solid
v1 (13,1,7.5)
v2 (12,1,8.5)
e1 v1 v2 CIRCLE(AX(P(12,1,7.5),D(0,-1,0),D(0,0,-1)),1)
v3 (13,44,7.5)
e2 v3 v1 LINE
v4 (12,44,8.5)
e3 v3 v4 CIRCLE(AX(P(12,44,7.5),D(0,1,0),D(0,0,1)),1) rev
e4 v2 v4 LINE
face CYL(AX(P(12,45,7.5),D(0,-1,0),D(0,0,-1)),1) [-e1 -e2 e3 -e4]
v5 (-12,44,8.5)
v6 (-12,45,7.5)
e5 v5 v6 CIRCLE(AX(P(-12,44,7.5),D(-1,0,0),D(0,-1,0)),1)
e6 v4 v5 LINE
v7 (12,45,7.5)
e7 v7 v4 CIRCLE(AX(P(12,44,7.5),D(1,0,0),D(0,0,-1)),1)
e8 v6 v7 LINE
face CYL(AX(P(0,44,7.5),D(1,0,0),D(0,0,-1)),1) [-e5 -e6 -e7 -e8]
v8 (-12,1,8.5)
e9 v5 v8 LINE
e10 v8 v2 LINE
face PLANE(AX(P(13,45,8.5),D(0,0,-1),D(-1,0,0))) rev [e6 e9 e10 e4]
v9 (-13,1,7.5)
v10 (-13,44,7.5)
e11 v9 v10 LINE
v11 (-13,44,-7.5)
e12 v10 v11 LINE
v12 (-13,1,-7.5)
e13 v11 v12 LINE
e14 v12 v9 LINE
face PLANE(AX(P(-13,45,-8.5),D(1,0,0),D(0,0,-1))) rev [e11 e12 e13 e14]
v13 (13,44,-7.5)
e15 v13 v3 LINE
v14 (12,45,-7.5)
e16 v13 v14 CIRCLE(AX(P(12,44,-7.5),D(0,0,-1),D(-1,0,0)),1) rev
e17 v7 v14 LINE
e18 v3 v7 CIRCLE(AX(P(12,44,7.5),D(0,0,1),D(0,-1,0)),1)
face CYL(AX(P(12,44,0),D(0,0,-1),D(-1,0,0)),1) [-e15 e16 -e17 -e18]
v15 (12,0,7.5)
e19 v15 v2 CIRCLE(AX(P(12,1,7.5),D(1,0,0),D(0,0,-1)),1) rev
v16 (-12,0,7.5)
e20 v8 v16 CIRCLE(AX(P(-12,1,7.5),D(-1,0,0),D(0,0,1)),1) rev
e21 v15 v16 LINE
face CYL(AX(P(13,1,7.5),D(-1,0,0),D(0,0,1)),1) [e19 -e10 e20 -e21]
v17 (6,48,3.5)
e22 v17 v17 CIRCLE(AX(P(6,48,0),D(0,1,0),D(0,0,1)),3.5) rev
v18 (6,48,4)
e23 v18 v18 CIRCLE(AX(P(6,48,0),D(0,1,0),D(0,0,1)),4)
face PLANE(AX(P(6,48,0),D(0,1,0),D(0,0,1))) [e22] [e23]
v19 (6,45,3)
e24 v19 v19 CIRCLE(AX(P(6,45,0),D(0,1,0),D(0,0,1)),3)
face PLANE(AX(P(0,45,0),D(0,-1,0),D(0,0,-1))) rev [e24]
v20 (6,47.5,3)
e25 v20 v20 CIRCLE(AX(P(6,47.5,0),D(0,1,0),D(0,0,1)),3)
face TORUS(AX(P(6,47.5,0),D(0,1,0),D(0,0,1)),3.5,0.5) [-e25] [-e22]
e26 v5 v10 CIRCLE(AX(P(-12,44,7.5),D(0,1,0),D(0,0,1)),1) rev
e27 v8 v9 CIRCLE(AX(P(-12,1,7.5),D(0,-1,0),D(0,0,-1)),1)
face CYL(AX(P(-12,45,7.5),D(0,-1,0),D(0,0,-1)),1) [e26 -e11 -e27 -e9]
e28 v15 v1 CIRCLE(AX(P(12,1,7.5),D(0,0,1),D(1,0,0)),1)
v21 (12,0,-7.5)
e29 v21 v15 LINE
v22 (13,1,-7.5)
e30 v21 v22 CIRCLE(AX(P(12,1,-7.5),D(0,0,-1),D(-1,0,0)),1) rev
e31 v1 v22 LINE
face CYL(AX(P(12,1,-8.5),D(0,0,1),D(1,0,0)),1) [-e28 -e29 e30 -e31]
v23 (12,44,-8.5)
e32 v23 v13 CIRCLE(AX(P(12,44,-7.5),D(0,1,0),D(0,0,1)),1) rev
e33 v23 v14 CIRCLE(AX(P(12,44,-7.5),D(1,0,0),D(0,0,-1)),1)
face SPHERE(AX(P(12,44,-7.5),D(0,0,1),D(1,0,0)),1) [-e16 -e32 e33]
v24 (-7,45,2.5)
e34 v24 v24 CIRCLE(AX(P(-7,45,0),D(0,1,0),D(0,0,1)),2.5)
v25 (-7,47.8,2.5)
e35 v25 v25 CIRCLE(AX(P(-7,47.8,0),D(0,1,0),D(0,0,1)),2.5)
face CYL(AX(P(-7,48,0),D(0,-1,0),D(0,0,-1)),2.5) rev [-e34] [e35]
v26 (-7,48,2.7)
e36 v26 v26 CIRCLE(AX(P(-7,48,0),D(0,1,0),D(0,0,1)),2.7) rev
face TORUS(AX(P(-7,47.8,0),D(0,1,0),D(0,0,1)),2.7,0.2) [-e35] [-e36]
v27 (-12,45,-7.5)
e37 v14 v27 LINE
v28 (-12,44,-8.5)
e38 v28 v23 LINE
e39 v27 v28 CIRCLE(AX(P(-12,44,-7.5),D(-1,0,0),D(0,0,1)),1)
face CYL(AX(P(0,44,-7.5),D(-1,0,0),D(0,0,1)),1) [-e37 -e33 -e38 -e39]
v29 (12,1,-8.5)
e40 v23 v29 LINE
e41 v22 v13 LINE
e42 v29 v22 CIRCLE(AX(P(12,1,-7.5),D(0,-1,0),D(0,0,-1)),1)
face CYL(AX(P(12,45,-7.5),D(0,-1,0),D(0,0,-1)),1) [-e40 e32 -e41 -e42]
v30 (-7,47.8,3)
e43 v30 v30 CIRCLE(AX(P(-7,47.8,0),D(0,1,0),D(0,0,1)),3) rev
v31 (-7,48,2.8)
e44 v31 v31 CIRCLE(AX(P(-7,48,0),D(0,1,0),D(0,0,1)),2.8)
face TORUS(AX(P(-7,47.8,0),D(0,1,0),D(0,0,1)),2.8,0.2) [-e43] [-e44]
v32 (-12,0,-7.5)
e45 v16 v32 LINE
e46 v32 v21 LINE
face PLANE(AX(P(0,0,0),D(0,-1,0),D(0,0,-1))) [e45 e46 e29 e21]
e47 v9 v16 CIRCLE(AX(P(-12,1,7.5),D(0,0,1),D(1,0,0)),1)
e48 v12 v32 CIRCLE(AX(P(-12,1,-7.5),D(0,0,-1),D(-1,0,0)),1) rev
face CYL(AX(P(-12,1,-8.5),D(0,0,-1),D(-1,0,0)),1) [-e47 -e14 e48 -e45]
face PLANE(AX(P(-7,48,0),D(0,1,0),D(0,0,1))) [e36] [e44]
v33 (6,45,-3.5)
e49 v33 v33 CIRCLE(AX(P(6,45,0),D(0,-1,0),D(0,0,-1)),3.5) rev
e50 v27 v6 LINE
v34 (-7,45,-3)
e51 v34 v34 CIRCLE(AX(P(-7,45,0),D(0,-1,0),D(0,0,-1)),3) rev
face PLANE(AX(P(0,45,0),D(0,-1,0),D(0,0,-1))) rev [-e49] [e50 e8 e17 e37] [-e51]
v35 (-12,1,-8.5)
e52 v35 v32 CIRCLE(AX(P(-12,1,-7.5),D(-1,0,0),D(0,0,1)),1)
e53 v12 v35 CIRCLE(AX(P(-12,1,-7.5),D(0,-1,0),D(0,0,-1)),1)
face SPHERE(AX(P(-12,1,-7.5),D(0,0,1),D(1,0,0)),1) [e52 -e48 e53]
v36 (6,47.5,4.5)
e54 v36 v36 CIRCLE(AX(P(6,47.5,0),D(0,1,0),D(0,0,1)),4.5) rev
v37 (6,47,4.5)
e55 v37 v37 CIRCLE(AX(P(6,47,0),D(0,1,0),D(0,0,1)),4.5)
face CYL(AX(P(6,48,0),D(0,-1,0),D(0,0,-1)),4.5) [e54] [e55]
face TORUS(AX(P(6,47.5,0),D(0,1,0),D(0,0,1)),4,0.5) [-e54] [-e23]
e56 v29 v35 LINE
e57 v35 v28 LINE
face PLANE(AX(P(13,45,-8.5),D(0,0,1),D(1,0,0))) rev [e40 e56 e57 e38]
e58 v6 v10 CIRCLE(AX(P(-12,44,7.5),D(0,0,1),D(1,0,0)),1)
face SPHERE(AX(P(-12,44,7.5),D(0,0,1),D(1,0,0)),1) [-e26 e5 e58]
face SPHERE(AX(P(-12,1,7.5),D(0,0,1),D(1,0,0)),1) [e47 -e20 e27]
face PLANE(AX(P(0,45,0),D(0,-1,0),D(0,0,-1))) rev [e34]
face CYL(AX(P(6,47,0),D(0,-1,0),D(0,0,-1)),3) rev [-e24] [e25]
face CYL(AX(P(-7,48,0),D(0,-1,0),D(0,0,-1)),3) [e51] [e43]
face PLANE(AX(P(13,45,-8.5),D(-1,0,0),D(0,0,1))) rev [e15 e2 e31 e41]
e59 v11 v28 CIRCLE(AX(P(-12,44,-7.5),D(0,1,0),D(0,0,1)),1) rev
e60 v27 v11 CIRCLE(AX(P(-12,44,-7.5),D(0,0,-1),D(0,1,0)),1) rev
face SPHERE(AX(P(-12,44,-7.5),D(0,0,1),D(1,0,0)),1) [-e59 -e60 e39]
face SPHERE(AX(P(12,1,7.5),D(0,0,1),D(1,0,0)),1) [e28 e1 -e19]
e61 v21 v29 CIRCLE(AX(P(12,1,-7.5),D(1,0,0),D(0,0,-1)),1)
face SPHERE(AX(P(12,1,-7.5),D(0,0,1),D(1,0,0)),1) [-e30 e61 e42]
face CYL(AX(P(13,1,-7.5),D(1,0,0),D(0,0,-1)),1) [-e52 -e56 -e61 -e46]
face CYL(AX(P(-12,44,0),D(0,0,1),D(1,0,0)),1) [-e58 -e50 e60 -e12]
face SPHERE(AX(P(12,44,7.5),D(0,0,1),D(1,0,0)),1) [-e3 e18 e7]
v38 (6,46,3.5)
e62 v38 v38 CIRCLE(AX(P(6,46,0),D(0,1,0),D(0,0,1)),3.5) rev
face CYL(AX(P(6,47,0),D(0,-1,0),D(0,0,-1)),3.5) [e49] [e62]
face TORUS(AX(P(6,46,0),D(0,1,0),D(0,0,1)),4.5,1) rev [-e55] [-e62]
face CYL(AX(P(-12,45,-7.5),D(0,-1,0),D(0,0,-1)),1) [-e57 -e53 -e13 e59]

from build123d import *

# Parameters (mm, degrees)
SKETCH1_W           = 26
SKETCH1_H           = 17
BOSS_EXTRUDE1_DEPTH = 45
FILLET1_R           = 1
SKETCH2_R           = 3
SKETCH2_R_2         = 2.5
BOSS_EXTRUDE2_DEPTH = 3
SKETCH3_R           = 3.5
SKETCH3_R_2         = 3
BOSS_EXTRUDE3_DEPTH = 2
SKETCH4_R           = 4.5
SKETCH4_R_2         = 3
BOSS_EXTRUDE4_DEPTH = 1
FILLET4_R           = 1
FILLET5_R           = 0.5
FILLET6_R           = 0.2


with BuildPart() as part:
    # Sketch1 → Boss-Extrude1 (new body)
    with BuildSketch(Plane(origin=(0, 0, 0), x_dir=(1, 0, 0), z_dir=(0, 1, 0))):
        Rectangle(SKETCH1_W, SKETCH1_H)
    extrude(amount=BOSS_EXTRUDE1_DEPTH)

    # Fillet1
    fillet1_edges = [part.edges().sort_by_distance(p)[0] for p in [
        (13, 45, 0),
        (0, 45, -8.5),
        (-13, 45, 0),
        (0, 0, -8.5),
        (13, 0, 0),
        (0, 0, 8.5),
        (-13, 0, 0),
        (0, 45, 8.5),
        (-13, 22.5, -8.5),
        (13, 22.5, -8.5),
        (13, 22.5, 8.5),
        (-13, 22.5, 8.5),
    ]]
    fillet(fillet1_edges, radius=FILLET1_R)

    # Sketch2 → Boss-Extrude2 (add)
    with BuildSketch(Plane(origin=(0, 45, 0), x_dir=(1, 0, 0), z_dir=(0, 1, 0))):
        with Locations(Location((-7, 0, 0), (0, 0, 90))):
            Circle(SKETCH2_R)
        with Locations(Location((-7, 0, 0), (0, 0, 270))):
            Circle(SKETCH2_R_2, mode=Mode.SUBTRACT)
    extrude(amount=BOSS_EXTRUDE2_DEPTH)

    # Sketch3 → Boss-Extrude3 (add)
    with BuildSketch(Plane(origin=(0, 45, 0), x_dir=(1, 0, 0), z_dir=(0, 1, 0))):
        with Locations(Location((6, 0, 0), (0, 0, 90))):
            Circle(SKETCH3_R)
        with Locations(Location((6, 0, 0), (0, 0, 270))):
            Circle(SKETCH3_R_2, mode=Mode.SUBTRACT)
    extrude(amount=BOSS_EXTRUDE3_DEPTH)

    # Sketch4 → Boss-Extrude4 (add)
    with BuildSketch(Plane(origin=(0, 47, 0), x_dir=(1, 0, 0), z_dir=(0, 1, 0))):
        with Locations(Location((6, 0, 0), (0, 0, 270))):
            Circle(SKETCH4_R)
        with Locations(Location((6, 0, 0), (0, 0, 270))):
            Circle(SKETCH4_R_2, mode=Mode.SUBTRACT)
    extrude(amount=BOSS_EXTRUDE4_DEPTH)

    # Fillet4
    fillet4_edges = [part.edges().sort_by_distance(p)[0] for p in [
        (6, 47, 3.5),
    ]]
    fillet(fillet4_edges, radius=FILLET4_R - 0.0001)  # a hair under: the kernel refuses the full size

    # Fillet5
    fillet5_edges = [part.edges().sort_by_distance(p)[0] for p in [
        (6, 48, -4.5),
        (6, 48, -3),
    ]]
    fillet(fillet5_edges, radius=FILLET5_R)

    # Fillet6
    fillet6_edges = [part.edges().sort_by_distance(p)[0] for p in [
        (-7, 48, 3),
        (-7, 48, -2.5),
    ]]
    fillet(fillet6_edges, radius=FILLET6_R)


solid = part.part
